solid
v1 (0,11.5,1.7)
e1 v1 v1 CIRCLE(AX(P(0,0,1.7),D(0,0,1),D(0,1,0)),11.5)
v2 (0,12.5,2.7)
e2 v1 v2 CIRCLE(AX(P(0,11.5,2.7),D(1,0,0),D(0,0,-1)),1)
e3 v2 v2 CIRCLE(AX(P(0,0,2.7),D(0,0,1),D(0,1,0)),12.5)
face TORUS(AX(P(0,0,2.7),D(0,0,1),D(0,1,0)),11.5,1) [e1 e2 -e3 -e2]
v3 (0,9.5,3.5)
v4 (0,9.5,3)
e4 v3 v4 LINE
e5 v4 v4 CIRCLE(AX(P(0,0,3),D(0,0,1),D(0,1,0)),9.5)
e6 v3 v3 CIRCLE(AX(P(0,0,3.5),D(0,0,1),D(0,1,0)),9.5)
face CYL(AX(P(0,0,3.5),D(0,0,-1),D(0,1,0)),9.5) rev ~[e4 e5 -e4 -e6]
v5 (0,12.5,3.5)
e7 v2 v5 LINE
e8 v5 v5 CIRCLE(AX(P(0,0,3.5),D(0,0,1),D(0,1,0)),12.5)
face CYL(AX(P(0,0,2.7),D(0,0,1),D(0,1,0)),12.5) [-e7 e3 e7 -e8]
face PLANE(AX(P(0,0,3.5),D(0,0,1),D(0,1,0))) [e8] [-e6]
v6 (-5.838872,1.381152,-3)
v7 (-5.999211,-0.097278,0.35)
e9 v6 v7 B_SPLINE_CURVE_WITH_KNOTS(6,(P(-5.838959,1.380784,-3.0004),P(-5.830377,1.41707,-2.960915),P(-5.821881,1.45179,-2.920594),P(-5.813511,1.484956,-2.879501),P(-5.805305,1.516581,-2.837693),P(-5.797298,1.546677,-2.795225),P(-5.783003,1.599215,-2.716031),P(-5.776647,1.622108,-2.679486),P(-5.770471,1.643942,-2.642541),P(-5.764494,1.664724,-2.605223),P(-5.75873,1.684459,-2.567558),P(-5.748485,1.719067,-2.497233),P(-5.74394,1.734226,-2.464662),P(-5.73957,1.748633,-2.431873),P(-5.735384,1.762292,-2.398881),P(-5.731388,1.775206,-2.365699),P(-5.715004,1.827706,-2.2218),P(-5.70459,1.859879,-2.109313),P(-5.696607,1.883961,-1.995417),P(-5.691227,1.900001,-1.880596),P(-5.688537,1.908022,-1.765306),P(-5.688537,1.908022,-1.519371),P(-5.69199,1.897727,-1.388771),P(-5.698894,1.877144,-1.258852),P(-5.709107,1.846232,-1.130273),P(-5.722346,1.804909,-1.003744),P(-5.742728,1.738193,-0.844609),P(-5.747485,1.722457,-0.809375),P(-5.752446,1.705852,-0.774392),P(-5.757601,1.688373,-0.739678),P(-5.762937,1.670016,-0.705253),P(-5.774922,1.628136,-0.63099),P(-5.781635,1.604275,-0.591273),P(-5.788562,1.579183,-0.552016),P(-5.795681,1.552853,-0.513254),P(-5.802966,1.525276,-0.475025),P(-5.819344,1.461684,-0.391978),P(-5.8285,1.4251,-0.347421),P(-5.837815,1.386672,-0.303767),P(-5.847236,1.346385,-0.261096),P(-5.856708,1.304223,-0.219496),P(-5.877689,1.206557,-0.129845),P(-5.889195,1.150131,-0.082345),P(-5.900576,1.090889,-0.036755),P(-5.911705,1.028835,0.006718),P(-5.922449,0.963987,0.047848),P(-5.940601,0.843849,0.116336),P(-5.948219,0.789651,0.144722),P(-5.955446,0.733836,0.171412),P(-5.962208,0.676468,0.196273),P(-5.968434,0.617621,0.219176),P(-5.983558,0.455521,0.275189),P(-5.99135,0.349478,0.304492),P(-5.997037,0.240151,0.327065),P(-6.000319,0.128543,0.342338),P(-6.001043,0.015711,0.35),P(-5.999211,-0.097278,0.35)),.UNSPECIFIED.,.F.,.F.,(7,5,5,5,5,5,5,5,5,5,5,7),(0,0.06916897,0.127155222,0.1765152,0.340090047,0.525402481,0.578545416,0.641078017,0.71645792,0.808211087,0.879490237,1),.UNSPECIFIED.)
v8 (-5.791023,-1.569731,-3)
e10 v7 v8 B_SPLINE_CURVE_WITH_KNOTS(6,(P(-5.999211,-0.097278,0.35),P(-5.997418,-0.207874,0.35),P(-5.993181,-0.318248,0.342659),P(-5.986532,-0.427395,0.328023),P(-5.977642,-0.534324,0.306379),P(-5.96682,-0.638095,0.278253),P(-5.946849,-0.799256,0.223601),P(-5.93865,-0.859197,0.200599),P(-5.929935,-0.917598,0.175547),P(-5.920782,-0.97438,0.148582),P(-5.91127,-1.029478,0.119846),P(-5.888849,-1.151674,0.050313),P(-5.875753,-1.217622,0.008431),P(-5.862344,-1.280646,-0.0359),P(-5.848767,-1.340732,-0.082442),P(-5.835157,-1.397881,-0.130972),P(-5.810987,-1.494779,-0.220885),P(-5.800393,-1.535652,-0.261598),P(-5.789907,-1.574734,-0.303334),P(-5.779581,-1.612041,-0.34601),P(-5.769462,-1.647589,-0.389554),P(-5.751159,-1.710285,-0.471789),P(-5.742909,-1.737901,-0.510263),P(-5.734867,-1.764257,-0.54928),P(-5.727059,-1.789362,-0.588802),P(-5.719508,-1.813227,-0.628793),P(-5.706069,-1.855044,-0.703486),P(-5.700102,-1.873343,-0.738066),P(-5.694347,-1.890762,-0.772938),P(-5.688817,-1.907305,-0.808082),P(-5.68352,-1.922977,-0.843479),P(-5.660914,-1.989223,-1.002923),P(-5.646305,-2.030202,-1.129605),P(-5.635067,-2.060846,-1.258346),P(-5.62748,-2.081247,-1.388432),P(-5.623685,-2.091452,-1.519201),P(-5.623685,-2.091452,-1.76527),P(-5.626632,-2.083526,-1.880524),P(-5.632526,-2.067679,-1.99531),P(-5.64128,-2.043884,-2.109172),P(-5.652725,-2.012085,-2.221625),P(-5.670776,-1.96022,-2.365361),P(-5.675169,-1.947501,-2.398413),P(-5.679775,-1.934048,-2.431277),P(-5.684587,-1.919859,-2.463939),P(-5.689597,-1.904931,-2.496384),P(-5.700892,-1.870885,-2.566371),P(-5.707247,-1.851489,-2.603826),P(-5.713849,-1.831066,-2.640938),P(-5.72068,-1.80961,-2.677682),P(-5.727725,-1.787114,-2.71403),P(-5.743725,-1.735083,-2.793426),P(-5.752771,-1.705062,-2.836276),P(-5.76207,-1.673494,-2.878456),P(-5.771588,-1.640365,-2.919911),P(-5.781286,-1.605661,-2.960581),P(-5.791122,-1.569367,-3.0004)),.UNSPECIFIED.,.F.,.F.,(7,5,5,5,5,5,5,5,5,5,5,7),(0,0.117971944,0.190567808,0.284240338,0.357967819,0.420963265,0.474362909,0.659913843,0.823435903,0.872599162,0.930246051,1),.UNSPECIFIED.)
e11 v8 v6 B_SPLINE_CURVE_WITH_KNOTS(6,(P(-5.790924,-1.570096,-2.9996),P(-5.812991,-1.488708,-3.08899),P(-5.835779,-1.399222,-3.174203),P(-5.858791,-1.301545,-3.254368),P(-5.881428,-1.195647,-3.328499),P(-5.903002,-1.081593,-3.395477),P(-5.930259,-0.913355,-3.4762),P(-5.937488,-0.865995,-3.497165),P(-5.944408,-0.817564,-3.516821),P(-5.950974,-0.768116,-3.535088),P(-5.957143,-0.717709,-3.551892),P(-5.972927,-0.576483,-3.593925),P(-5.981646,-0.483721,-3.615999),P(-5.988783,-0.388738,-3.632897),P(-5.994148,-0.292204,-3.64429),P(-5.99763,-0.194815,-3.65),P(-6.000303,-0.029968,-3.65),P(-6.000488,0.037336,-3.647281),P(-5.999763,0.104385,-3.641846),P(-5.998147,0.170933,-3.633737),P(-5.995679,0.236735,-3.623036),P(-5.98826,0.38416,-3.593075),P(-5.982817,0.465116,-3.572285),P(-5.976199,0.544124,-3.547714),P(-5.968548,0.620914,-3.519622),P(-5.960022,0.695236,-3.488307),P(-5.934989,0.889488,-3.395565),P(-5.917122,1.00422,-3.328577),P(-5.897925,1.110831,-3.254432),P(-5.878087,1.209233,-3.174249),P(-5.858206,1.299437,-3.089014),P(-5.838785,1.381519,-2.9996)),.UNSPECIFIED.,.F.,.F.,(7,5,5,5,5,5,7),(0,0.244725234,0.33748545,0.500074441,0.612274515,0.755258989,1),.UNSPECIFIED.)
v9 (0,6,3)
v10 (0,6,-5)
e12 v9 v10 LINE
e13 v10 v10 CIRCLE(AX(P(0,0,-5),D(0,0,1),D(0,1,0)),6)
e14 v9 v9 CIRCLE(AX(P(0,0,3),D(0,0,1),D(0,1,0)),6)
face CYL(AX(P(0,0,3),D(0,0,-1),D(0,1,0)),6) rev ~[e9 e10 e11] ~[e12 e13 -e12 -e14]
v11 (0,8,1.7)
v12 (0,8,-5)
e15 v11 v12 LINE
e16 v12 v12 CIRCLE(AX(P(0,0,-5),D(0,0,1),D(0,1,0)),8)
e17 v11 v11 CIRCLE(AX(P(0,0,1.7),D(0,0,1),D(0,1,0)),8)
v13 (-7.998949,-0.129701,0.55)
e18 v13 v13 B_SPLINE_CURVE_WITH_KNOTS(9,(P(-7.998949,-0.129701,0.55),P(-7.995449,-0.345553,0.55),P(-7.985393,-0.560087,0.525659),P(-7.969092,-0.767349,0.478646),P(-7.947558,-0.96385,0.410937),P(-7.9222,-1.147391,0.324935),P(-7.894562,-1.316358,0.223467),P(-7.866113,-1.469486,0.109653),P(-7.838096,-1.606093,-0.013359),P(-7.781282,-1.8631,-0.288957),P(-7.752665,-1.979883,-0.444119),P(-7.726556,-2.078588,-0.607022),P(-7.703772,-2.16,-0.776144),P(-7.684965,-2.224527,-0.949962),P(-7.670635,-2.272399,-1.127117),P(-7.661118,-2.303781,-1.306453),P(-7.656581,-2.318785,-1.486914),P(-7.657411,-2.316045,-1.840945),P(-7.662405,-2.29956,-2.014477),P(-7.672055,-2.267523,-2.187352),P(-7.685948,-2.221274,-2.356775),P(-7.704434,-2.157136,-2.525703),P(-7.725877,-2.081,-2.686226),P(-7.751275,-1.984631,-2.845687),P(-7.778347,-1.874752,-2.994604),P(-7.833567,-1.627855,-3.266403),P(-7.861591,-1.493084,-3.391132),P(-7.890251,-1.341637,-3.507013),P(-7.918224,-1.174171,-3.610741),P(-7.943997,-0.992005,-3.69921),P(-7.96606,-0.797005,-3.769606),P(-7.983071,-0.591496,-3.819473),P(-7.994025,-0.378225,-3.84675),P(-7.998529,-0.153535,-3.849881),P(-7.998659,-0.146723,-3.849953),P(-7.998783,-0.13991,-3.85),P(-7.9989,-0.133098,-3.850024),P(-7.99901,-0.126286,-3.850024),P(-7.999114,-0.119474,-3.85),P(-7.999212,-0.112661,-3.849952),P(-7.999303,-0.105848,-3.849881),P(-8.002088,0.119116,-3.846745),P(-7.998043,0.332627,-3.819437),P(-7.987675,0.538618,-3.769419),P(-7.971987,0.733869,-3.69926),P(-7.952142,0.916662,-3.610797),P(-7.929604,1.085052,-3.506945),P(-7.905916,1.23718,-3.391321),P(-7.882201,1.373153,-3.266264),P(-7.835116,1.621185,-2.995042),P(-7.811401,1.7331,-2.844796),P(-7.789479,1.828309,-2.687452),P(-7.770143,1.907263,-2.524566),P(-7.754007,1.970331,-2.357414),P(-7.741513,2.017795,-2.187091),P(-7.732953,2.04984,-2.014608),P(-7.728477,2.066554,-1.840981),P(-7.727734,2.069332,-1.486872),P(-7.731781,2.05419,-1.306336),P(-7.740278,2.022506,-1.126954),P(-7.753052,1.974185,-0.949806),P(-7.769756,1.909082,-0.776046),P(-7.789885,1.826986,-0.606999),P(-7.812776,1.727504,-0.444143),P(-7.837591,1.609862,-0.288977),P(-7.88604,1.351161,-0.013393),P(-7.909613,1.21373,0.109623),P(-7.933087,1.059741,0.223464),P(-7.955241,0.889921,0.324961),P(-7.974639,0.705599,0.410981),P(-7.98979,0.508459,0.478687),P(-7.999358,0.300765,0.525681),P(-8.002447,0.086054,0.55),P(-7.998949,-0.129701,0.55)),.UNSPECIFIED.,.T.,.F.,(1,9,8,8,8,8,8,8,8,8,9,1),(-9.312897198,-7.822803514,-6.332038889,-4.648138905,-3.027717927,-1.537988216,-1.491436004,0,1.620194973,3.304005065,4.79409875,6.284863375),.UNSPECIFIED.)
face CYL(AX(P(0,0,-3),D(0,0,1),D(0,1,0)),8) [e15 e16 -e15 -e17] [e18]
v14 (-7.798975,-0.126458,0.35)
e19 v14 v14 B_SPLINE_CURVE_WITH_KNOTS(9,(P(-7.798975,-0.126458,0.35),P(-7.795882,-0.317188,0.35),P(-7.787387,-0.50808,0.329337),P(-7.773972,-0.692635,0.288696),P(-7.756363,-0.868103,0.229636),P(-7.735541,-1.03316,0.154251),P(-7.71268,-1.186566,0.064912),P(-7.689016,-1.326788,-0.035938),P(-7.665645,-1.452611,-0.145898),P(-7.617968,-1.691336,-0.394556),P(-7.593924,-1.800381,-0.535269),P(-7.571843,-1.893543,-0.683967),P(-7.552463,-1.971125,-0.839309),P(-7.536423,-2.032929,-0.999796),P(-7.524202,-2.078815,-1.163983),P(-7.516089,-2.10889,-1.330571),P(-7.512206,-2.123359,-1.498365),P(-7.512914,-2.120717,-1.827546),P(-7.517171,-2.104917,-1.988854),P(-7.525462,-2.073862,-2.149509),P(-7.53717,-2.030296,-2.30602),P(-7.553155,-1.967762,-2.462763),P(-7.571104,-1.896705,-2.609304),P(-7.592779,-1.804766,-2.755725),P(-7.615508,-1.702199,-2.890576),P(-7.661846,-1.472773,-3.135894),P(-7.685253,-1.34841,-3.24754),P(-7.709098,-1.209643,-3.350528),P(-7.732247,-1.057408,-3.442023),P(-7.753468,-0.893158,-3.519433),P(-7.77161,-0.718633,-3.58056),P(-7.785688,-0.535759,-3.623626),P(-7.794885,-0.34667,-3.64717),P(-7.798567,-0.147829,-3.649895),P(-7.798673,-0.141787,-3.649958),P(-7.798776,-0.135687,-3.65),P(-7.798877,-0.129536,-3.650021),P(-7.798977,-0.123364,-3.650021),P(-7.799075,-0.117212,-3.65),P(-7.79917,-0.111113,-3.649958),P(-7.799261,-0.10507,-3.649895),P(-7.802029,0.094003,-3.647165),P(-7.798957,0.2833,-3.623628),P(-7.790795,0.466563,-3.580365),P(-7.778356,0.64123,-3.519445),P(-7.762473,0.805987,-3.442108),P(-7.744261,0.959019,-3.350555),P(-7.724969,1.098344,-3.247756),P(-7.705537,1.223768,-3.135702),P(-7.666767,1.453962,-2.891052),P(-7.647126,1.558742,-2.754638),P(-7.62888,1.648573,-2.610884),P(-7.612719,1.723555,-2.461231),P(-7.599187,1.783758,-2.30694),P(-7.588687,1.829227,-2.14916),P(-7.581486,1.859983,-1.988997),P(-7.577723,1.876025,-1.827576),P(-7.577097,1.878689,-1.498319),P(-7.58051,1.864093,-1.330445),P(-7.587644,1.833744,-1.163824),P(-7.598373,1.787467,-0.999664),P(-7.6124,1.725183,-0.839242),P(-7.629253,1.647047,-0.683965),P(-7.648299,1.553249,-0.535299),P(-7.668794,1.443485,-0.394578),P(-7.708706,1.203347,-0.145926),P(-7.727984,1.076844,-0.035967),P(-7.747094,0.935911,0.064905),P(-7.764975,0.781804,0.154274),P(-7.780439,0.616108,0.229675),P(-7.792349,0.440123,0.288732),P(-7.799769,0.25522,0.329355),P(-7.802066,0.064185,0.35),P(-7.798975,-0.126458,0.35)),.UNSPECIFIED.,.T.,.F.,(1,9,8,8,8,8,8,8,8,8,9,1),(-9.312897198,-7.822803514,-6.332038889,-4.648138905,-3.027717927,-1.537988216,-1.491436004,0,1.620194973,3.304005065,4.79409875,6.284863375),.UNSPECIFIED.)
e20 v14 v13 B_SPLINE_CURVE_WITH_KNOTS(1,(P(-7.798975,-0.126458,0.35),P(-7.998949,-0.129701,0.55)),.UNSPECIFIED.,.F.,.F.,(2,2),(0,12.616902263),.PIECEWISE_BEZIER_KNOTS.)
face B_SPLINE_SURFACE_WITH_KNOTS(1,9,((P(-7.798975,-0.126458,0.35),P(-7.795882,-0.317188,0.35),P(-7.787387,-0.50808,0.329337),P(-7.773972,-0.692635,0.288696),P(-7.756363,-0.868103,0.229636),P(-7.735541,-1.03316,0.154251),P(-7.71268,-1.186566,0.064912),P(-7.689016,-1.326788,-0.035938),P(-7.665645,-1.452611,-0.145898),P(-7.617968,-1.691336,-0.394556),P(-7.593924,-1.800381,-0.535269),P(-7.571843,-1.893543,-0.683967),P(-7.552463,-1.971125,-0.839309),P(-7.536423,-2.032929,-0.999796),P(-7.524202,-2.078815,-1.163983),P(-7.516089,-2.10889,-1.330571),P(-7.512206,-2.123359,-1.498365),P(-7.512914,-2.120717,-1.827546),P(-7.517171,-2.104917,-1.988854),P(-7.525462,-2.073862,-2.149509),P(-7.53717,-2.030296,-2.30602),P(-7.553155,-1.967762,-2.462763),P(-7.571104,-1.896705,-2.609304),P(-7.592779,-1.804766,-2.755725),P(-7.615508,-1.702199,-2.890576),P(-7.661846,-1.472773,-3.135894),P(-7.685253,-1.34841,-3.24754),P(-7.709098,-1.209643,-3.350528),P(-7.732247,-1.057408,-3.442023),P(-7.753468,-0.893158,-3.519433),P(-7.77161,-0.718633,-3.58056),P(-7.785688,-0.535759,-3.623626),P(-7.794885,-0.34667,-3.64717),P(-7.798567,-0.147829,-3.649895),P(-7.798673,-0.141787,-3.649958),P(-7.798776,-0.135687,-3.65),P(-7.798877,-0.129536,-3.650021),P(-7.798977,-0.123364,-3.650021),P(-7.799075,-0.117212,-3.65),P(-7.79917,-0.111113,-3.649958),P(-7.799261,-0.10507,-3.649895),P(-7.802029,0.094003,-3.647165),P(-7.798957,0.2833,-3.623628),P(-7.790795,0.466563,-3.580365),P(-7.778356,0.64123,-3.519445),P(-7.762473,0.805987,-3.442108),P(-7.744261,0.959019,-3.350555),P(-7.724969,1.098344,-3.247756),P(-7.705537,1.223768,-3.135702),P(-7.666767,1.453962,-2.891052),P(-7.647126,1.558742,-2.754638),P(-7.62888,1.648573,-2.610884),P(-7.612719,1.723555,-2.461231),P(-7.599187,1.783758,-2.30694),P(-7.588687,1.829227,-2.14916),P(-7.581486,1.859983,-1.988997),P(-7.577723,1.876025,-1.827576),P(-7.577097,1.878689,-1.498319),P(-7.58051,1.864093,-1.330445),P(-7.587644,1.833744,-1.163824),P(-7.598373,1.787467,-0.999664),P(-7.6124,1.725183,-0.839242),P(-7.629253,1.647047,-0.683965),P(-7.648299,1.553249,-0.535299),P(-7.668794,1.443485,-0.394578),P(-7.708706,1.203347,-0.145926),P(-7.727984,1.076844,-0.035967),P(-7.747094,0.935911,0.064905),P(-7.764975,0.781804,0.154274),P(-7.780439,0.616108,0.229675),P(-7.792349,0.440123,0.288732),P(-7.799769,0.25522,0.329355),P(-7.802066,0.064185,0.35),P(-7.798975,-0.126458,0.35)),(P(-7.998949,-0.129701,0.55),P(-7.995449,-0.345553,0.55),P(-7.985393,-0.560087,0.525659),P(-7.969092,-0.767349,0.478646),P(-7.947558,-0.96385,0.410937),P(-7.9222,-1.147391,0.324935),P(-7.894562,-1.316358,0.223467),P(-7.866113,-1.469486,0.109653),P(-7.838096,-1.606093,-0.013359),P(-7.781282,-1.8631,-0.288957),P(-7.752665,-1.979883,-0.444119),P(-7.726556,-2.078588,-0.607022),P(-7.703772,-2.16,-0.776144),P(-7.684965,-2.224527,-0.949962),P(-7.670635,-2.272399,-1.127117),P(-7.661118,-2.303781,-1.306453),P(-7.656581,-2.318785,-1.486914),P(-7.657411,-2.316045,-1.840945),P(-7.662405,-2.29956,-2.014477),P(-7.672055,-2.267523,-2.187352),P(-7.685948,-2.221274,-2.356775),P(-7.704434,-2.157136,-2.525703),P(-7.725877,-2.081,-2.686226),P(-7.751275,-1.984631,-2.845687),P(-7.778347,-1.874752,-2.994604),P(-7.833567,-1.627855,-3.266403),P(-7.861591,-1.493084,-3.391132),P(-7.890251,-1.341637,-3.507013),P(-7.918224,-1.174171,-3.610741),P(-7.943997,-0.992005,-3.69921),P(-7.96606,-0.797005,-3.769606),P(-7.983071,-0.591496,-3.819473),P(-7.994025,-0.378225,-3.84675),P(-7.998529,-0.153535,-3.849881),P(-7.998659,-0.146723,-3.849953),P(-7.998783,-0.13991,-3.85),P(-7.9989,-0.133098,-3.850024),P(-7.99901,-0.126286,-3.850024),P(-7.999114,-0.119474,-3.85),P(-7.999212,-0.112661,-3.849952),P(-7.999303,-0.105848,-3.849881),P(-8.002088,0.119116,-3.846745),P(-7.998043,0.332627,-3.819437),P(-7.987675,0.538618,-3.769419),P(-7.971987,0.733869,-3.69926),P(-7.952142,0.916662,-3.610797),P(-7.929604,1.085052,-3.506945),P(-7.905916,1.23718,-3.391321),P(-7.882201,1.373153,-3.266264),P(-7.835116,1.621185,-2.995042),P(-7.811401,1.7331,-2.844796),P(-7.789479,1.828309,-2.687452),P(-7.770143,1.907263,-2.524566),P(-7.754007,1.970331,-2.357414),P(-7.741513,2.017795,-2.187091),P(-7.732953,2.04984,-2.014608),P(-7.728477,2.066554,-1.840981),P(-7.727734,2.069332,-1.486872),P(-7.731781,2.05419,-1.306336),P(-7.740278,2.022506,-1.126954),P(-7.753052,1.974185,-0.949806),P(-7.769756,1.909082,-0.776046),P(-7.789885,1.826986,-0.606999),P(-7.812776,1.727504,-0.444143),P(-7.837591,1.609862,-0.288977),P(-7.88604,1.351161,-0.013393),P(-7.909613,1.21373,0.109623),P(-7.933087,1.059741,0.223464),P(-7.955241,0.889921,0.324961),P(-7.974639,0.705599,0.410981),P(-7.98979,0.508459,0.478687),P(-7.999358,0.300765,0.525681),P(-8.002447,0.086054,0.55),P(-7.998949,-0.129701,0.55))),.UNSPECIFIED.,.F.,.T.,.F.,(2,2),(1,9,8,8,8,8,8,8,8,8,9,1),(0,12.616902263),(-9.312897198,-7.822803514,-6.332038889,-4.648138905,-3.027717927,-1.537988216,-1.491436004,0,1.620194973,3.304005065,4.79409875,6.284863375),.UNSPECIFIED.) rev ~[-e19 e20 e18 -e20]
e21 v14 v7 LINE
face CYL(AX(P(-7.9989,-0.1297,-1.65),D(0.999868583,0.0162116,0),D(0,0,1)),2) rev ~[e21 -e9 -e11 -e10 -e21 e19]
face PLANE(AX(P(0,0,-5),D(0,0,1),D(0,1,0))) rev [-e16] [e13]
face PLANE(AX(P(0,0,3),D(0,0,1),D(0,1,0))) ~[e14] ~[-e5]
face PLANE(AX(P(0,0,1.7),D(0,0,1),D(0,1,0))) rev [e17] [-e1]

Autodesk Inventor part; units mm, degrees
ref_plane "YZ Plane" through (0, 0, 0) normal (1, 0, 0) x (0, 1, 0)
ref_plane "XZ Plane" through (0, 0, 0) normal (0, 1, 0) x (-1, 0, 0)
ref_plane "XY Plane" through (0, 0, 0) normal (0, 0, 1) x (1, 0, 0)
sketch "Sketch1" plane through (0, 0, 0) normal (1, 0, 0) x (0, 1, 0)
  line L0 (6, 3) -> (6, -3)
  line L1 (8, 1.7) -> (11.5, 1.7)
  line L2 (12.5, 2.7) -> (12.5, 3.5)
  line L3 (12.5, 2.7) -> (11.5, 2.7) construction
  line L4 (11.5, 2.7) -> (11.5, 1.7) construction
  arc A0 (11.5, 1.7) -> (12.5, 2.7) centre (11.5, 2.7) ccw
  line L5 (6, 3) -> (9.5, 3)
  line L6 (12.5, 3.5) -> (9.5, 3.5)
  line L7 (9.5, 3.5) -> (9.5, 3)
  line L8 (0, 0) -> (0, 11.4482) construction
  line L9 (8, -3) -> (8, 1.7)
  line L10 (6, -3) -> (6, -5)
  line L11 (6, -5) -> (8, -5)
  line L12 (8, -5) -> (8, -3)
  point P0 (7, 0.2)
  dimension "d0" = 6
  dimension "d1" = 3
  dimension "d5" = 0.8
  dimension "d6" = 1
  dimension "d7" = 1
  dimension "d8" = 3
  dimension "d10" = 6
  dimension "d12" = 0.5
  dimension "d14" = 3.5
  dimension "d26" = 2
  dimension "d27" = 4.7
revolve "Revolution1" add sketch "Sketch1" angle 360 about axis through (0, 0, 0) along (0, 0, 1)
ref_plane "Work Plane2" through (-7.9989, -0.1297, -1.65) normal (-0.9998686, -0.0162116, 0) x (0, 0, 1)
ref_plane "Work Plane1" through (21.3966, -11.9547, -30.348) normal (-0.9998686, -0.0162116, 0) x (0, 0, 1)
sketch "Sketch2" plane through (-7.9989, -0.1297, -1.65) normal (-0.9998686, -0.0162116, 0) x (0, 0, 1)
  circle A0 centre (0, 0) radius 1.5
  point P0 (1.65, 0)
  dimension "d15" = 3
hole "Hole1" at (-7.9989, -0.1297, -1.65) direction (0.9998686, 0.0162116, 0) diameter 4 depth 8.8 tip angle 118
chamfer "Chamfer1" distance 0.2 angle 45 2 edges at (-7.8033, 1.7632, -0.9945) (-7.742, -2.0152, -0.9943)
ref_plane "Work Plane4" through (-7.9989, -0.1297, 0.55) normal (-0.9998686, -0.0162116, 0) x (0.0162116, -0.9998686, 0)
equation "\"d1\" = 0.5 * d0"
equation "\"d7\" = d6"
properties part number "tarcza sprzęgła"
